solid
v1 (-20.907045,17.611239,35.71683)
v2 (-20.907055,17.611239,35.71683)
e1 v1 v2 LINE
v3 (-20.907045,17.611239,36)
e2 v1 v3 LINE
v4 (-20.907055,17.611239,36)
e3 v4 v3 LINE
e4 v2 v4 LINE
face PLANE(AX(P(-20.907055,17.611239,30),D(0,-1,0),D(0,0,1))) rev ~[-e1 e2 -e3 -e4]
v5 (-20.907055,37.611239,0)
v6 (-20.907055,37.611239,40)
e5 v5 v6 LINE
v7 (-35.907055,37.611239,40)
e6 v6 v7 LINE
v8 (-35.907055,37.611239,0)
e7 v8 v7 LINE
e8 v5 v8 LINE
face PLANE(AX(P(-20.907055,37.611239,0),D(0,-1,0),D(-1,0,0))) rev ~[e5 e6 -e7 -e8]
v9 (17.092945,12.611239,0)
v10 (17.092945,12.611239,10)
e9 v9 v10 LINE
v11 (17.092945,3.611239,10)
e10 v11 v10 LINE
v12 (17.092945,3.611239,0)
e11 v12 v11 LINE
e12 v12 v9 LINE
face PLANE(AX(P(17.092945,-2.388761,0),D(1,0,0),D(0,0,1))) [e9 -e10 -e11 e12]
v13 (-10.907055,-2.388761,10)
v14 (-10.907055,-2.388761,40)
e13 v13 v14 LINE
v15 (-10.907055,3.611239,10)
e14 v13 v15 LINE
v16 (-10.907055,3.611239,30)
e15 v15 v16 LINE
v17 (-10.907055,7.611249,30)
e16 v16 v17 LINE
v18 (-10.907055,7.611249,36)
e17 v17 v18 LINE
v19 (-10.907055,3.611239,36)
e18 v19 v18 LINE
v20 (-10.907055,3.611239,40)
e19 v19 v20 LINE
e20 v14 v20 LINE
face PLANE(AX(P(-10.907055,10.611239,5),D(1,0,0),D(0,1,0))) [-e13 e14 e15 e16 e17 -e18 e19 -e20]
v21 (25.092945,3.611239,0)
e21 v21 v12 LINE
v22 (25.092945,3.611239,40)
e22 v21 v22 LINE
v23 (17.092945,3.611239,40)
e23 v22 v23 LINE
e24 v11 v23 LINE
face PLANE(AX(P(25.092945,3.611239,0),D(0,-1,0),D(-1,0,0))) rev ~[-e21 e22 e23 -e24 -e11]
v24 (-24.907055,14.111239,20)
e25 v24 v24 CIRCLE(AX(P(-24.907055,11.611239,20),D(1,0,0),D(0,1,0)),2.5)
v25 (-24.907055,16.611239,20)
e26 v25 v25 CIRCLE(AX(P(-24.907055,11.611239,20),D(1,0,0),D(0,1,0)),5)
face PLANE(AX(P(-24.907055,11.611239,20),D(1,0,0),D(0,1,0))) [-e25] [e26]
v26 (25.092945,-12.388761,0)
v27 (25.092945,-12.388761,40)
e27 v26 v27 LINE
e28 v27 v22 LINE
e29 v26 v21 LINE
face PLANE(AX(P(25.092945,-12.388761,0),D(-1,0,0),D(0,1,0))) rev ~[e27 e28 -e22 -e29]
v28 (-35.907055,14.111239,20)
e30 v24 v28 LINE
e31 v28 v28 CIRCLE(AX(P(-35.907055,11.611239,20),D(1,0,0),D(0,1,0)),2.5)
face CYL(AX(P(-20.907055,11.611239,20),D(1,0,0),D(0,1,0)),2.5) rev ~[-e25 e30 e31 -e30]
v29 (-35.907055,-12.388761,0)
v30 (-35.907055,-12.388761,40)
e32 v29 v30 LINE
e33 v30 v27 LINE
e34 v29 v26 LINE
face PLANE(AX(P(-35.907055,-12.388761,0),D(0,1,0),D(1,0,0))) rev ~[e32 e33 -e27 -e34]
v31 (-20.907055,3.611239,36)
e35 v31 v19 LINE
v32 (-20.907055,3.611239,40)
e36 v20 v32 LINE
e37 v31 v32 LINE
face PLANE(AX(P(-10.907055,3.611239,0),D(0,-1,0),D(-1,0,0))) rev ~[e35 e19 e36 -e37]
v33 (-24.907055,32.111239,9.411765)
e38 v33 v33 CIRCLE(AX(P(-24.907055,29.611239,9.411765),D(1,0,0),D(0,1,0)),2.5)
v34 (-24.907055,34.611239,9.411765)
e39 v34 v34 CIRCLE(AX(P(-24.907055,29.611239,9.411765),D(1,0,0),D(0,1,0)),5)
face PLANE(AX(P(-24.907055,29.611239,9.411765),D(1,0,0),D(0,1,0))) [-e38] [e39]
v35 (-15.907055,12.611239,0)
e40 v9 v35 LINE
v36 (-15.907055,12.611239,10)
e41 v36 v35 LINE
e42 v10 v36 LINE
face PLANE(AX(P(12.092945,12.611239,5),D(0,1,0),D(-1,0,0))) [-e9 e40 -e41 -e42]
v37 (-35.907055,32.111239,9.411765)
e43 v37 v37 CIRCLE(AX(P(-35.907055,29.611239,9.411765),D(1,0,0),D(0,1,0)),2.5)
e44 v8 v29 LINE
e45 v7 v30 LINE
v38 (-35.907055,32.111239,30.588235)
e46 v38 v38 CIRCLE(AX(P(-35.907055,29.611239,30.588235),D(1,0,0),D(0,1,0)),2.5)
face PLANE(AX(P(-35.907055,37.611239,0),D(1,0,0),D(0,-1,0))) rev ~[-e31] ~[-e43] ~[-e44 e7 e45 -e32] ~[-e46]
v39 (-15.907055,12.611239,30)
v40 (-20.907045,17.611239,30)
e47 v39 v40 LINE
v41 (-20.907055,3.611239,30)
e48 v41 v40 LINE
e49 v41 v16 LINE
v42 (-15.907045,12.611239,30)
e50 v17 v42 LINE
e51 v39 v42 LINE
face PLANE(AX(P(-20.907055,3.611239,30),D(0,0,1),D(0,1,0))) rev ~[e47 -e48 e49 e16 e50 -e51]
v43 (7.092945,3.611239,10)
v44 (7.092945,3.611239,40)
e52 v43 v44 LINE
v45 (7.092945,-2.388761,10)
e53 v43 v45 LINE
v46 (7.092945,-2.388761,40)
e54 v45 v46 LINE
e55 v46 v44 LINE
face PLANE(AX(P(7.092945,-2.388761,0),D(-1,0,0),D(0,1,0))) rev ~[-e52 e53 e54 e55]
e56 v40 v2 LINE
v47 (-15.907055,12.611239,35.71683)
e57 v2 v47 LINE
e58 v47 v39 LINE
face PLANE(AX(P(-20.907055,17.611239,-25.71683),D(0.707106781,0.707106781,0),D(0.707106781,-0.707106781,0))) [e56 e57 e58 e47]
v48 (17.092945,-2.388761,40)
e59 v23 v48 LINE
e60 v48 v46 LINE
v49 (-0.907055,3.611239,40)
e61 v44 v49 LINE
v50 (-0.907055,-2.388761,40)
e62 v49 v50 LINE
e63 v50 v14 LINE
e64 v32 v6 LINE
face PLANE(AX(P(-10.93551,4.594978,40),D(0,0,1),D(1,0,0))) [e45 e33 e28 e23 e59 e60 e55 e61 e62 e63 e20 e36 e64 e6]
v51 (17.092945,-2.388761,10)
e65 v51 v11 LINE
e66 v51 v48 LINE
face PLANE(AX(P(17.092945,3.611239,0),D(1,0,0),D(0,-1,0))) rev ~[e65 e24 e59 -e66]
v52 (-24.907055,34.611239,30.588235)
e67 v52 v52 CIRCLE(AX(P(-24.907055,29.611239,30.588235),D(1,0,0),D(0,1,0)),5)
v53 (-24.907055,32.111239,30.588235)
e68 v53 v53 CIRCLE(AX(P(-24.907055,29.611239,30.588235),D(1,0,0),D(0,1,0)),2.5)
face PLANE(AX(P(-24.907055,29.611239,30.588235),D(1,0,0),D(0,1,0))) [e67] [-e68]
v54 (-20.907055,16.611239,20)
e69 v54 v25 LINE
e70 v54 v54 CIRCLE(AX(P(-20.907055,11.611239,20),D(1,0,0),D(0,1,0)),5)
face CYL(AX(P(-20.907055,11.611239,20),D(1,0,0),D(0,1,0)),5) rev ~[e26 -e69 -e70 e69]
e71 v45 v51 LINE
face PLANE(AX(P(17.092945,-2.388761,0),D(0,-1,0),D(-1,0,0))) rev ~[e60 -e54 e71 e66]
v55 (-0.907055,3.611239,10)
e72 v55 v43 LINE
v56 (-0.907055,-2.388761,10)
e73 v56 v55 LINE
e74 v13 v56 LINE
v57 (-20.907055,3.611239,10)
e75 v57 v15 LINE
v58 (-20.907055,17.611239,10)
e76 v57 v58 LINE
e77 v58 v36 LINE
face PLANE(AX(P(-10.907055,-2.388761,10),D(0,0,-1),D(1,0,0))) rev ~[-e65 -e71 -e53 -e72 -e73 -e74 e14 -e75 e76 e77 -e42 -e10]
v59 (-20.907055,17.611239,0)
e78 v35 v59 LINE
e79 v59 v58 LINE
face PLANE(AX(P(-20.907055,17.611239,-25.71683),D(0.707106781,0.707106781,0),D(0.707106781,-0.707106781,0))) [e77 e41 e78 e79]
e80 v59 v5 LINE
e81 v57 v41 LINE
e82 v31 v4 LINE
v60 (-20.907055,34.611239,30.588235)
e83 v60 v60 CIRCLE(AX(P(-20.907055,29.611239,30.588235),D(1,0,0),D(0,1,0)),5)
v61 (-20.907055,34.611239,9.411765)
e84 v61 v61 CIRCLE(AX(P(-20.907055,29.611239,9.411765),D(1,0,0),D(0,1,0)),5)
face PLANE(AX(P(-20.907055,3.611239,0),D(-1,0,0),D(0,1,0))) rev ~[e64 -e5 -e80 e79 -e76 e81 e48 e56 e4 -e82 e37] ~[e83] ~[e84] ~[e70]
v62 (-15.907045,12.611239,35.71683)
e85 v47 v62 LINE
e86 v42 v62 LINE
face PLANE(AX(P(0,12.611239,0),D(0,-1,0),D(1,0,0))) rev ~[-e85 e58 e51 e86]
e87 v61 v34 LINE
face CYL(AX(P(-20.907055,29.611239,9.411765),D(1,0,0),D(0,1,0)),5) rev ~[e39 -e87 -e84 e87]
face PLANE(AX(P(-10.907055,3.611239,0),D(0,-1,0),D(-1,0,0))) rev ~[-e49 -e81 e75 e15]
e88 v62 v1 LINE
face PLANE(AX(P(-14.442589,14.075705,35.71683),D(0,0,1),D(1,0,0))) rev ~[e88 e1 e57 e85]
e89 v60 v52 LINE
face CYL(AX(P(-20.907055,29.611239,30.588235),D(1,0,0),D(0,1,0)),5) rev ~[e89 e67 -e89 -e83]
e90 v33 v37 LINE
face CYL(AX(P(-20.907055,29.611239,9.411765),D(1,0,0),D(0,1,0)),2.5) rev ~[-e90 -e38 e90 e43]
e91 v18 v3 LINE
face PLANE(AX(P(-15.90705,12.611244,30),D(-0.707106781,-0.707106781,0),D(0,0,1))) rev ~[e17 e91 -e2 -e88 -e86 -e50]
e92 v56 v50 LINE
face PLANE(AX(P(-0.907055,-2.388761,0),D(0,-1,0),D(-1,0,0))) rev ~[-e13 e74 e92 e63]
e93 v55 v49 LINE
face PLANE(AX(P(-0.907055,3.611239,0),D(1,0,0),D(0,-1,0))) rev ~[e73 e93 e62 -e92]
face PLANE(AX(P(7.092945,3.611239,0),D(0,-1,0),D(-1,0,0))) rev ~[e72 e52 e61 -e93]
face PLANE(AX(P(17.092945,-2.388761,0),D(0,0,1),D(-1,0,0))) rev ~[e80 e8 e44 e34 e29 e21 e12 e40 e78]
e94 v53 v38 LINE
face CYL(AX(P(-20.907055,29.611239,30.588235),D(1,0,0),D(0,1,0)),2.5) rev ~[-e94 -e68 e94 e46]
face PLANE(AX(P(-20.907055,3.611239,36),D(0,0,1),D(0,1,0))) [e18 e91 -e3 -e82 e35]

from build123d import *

# Parameters (mm, degrees)
F1_DEPTH     = 40
F2_R         = 5
F2_R_2       = 2.5
F3_DEPTH     = 4
F4_DEPTH     = 15.001
F2_W         = 14
F2_H         = 6
F5_DEPTH     = 10
F2_H_2       = 10
F6_DEPTH     = 10
F7_SIZE      = 9.99999
F8_W         = 10
F8_H         = 10
F8_W_2       = 8
F9_DEPTH     = 15
F10_T4_DEPTH = 61.4336597593


# Not quite as in the source:
# - a fillet or chamfer that OpenCascade refuses, or shapes differently, is made with other operations: its cross-section is extruded or revolved along the edge and cut away or added
# - a fillet or chamfer is up to 0.001 mm smaller than in the source, because OpenCascade refuses the exact size
# - a feature names something its author has since deleted; it is built from what else it names


with BuildPart() as f1:
    # F0 (on Top) → F1 (new body)
    with BuildSketch(Plane.XY):
        Polygon((-20.9070546148, 3.6112386312), (-20.9070546148, 37.6112386312), (-35.9070546148, 37.6112386312), (-35.9070546148, -12.3887613688), (25.0929453852, -12.3887613688), (25.0929453852, 3.6112386312), (17.0929453852, 3.6112386312), (17.0929453852, -2.3887613688), (7.0929453852, -2.3887613688), (7.0929453852, 3.6112386312), (-0.9070546148, 3.6112386312), (-0.9070546148, -2.3887613688), (-10.9070546148, -2.3887613688), (-10.9070546148, 3.6112386312), align=None)
    extrude(amount=F1_DEPTH)

    # F2 (on face) → F3 (cut)
    with BuildSketch(Plane.YZ.offset(-20.9070546148)):
        with Locations((29.6112386312, 9.4117647059)):
            Circle(F2_R)
        with Locations((29.6112386312, 9.4117647059)):
            Circle(F2_R_2, mode=Mode.SUBTRACT)
        with Locations((11.6112386312, 20)):
            Circle(F2_R)
        with Locations((11.6112386312, 20)):
            Circle(F2_R_2, mode=Mode.SUBTRACT)
        with Locations((29.6112386312, 30.5882352941)):
            Circle(F2_R)
        with Locations((29.6112386312, 30.5882352941)):
            Circle(F2_R_2, mode=Mode.SUBTRACT)
    extrude(amount=-F3_DEPTH, mode=Mode.SUBTRACT)

    # F4 (cut, through all): faces of the model
    f4_faces = [f1.faces().sort_by_distance(p)[0] for p in [
        (-20.9070546148, 29.6112386312, 9.4117647059),
        (-20.9070546148, 11.6112386312, 20),
        (-20.9070546148, 29.6112386312, 30.5882352941),
    ]]
    extrude(f4_faces, amount=-F4_DEPTH, mode=Mode.SUBTRACT)

    # F2 (on face) → F5 (join)
    with BuildSketch(Plane.YZ.offset(-20.9070546148)):
        with Locations((10.6112386312, 33)):
            Rectangle(F2_W, F2_H)
    extrude(amount=F5_DEPTH)

    # F2 (on face) → F6 (join)
    with BuildSketch(Plane.YZ.offset(-20.9070546148)):
        with Locations((10.6112386312, 5)):
            Rectangle(F2_W, F2_H_2)
    extrude(amount=F6_DEPTH)

    # F7 (size 10 in the source; OpenCascade refuses exactly that, so slightly less here)
    f7_edges = [f1.edges().sort_by_distance(p)[0] for p in [
        (-10.907055, 17.611239, 33),
    ]]
    chamfer(f7_edges, length=F7_SIZE)

    # F8 (on face) → F9 (join)
    with BuildSketch(Plane(origin=(0, -2.3887613688, 0), x_dir=(-1, 0, 0), z_dir=(0, 1, 0))):
        with Locations((-12.0929453852, 5)):
            Rectangle(F8_W, F8_H)
        with Locations((5.9070546148, 5)):
            Rectangle(F8_W, F8_H)
        with Locations((-3.0929453852, 5)):
            Rectangle(F8_W_2, F8_H)
    extrude(amount=F9_DEPTH)

    # F10: chamfer of 10 on 1 edges, made by hand


with BuildPart() as f10_tool2:
    # F10_s3 → F10_t4 (new body)
    with BuildSketch(Plane.XY.offset(-25.7168298797)):
        Polygon((-20.9070546148, 17.6112386312), (-10.9070546148, 7.6112386312), (-10.9070546148, 17.6112386312), align=None)
    extrude(amount=F10_T4_DEPTH)

    split(bisect_by=Plane.YZ.offset(-20.9070546148), keep=Keep.TOP)

    split(bisect_by=Plane.XZ.offset(-12.6112386312), keep=Keep.BOTTOM)


with BuildPart() as f1_1:
    add(f1.part)

    # F10_t1: cut F10_tool2
    add(f10_tool2.part, mode=Mode.SUBTRACT)


solid = f1_1.part
